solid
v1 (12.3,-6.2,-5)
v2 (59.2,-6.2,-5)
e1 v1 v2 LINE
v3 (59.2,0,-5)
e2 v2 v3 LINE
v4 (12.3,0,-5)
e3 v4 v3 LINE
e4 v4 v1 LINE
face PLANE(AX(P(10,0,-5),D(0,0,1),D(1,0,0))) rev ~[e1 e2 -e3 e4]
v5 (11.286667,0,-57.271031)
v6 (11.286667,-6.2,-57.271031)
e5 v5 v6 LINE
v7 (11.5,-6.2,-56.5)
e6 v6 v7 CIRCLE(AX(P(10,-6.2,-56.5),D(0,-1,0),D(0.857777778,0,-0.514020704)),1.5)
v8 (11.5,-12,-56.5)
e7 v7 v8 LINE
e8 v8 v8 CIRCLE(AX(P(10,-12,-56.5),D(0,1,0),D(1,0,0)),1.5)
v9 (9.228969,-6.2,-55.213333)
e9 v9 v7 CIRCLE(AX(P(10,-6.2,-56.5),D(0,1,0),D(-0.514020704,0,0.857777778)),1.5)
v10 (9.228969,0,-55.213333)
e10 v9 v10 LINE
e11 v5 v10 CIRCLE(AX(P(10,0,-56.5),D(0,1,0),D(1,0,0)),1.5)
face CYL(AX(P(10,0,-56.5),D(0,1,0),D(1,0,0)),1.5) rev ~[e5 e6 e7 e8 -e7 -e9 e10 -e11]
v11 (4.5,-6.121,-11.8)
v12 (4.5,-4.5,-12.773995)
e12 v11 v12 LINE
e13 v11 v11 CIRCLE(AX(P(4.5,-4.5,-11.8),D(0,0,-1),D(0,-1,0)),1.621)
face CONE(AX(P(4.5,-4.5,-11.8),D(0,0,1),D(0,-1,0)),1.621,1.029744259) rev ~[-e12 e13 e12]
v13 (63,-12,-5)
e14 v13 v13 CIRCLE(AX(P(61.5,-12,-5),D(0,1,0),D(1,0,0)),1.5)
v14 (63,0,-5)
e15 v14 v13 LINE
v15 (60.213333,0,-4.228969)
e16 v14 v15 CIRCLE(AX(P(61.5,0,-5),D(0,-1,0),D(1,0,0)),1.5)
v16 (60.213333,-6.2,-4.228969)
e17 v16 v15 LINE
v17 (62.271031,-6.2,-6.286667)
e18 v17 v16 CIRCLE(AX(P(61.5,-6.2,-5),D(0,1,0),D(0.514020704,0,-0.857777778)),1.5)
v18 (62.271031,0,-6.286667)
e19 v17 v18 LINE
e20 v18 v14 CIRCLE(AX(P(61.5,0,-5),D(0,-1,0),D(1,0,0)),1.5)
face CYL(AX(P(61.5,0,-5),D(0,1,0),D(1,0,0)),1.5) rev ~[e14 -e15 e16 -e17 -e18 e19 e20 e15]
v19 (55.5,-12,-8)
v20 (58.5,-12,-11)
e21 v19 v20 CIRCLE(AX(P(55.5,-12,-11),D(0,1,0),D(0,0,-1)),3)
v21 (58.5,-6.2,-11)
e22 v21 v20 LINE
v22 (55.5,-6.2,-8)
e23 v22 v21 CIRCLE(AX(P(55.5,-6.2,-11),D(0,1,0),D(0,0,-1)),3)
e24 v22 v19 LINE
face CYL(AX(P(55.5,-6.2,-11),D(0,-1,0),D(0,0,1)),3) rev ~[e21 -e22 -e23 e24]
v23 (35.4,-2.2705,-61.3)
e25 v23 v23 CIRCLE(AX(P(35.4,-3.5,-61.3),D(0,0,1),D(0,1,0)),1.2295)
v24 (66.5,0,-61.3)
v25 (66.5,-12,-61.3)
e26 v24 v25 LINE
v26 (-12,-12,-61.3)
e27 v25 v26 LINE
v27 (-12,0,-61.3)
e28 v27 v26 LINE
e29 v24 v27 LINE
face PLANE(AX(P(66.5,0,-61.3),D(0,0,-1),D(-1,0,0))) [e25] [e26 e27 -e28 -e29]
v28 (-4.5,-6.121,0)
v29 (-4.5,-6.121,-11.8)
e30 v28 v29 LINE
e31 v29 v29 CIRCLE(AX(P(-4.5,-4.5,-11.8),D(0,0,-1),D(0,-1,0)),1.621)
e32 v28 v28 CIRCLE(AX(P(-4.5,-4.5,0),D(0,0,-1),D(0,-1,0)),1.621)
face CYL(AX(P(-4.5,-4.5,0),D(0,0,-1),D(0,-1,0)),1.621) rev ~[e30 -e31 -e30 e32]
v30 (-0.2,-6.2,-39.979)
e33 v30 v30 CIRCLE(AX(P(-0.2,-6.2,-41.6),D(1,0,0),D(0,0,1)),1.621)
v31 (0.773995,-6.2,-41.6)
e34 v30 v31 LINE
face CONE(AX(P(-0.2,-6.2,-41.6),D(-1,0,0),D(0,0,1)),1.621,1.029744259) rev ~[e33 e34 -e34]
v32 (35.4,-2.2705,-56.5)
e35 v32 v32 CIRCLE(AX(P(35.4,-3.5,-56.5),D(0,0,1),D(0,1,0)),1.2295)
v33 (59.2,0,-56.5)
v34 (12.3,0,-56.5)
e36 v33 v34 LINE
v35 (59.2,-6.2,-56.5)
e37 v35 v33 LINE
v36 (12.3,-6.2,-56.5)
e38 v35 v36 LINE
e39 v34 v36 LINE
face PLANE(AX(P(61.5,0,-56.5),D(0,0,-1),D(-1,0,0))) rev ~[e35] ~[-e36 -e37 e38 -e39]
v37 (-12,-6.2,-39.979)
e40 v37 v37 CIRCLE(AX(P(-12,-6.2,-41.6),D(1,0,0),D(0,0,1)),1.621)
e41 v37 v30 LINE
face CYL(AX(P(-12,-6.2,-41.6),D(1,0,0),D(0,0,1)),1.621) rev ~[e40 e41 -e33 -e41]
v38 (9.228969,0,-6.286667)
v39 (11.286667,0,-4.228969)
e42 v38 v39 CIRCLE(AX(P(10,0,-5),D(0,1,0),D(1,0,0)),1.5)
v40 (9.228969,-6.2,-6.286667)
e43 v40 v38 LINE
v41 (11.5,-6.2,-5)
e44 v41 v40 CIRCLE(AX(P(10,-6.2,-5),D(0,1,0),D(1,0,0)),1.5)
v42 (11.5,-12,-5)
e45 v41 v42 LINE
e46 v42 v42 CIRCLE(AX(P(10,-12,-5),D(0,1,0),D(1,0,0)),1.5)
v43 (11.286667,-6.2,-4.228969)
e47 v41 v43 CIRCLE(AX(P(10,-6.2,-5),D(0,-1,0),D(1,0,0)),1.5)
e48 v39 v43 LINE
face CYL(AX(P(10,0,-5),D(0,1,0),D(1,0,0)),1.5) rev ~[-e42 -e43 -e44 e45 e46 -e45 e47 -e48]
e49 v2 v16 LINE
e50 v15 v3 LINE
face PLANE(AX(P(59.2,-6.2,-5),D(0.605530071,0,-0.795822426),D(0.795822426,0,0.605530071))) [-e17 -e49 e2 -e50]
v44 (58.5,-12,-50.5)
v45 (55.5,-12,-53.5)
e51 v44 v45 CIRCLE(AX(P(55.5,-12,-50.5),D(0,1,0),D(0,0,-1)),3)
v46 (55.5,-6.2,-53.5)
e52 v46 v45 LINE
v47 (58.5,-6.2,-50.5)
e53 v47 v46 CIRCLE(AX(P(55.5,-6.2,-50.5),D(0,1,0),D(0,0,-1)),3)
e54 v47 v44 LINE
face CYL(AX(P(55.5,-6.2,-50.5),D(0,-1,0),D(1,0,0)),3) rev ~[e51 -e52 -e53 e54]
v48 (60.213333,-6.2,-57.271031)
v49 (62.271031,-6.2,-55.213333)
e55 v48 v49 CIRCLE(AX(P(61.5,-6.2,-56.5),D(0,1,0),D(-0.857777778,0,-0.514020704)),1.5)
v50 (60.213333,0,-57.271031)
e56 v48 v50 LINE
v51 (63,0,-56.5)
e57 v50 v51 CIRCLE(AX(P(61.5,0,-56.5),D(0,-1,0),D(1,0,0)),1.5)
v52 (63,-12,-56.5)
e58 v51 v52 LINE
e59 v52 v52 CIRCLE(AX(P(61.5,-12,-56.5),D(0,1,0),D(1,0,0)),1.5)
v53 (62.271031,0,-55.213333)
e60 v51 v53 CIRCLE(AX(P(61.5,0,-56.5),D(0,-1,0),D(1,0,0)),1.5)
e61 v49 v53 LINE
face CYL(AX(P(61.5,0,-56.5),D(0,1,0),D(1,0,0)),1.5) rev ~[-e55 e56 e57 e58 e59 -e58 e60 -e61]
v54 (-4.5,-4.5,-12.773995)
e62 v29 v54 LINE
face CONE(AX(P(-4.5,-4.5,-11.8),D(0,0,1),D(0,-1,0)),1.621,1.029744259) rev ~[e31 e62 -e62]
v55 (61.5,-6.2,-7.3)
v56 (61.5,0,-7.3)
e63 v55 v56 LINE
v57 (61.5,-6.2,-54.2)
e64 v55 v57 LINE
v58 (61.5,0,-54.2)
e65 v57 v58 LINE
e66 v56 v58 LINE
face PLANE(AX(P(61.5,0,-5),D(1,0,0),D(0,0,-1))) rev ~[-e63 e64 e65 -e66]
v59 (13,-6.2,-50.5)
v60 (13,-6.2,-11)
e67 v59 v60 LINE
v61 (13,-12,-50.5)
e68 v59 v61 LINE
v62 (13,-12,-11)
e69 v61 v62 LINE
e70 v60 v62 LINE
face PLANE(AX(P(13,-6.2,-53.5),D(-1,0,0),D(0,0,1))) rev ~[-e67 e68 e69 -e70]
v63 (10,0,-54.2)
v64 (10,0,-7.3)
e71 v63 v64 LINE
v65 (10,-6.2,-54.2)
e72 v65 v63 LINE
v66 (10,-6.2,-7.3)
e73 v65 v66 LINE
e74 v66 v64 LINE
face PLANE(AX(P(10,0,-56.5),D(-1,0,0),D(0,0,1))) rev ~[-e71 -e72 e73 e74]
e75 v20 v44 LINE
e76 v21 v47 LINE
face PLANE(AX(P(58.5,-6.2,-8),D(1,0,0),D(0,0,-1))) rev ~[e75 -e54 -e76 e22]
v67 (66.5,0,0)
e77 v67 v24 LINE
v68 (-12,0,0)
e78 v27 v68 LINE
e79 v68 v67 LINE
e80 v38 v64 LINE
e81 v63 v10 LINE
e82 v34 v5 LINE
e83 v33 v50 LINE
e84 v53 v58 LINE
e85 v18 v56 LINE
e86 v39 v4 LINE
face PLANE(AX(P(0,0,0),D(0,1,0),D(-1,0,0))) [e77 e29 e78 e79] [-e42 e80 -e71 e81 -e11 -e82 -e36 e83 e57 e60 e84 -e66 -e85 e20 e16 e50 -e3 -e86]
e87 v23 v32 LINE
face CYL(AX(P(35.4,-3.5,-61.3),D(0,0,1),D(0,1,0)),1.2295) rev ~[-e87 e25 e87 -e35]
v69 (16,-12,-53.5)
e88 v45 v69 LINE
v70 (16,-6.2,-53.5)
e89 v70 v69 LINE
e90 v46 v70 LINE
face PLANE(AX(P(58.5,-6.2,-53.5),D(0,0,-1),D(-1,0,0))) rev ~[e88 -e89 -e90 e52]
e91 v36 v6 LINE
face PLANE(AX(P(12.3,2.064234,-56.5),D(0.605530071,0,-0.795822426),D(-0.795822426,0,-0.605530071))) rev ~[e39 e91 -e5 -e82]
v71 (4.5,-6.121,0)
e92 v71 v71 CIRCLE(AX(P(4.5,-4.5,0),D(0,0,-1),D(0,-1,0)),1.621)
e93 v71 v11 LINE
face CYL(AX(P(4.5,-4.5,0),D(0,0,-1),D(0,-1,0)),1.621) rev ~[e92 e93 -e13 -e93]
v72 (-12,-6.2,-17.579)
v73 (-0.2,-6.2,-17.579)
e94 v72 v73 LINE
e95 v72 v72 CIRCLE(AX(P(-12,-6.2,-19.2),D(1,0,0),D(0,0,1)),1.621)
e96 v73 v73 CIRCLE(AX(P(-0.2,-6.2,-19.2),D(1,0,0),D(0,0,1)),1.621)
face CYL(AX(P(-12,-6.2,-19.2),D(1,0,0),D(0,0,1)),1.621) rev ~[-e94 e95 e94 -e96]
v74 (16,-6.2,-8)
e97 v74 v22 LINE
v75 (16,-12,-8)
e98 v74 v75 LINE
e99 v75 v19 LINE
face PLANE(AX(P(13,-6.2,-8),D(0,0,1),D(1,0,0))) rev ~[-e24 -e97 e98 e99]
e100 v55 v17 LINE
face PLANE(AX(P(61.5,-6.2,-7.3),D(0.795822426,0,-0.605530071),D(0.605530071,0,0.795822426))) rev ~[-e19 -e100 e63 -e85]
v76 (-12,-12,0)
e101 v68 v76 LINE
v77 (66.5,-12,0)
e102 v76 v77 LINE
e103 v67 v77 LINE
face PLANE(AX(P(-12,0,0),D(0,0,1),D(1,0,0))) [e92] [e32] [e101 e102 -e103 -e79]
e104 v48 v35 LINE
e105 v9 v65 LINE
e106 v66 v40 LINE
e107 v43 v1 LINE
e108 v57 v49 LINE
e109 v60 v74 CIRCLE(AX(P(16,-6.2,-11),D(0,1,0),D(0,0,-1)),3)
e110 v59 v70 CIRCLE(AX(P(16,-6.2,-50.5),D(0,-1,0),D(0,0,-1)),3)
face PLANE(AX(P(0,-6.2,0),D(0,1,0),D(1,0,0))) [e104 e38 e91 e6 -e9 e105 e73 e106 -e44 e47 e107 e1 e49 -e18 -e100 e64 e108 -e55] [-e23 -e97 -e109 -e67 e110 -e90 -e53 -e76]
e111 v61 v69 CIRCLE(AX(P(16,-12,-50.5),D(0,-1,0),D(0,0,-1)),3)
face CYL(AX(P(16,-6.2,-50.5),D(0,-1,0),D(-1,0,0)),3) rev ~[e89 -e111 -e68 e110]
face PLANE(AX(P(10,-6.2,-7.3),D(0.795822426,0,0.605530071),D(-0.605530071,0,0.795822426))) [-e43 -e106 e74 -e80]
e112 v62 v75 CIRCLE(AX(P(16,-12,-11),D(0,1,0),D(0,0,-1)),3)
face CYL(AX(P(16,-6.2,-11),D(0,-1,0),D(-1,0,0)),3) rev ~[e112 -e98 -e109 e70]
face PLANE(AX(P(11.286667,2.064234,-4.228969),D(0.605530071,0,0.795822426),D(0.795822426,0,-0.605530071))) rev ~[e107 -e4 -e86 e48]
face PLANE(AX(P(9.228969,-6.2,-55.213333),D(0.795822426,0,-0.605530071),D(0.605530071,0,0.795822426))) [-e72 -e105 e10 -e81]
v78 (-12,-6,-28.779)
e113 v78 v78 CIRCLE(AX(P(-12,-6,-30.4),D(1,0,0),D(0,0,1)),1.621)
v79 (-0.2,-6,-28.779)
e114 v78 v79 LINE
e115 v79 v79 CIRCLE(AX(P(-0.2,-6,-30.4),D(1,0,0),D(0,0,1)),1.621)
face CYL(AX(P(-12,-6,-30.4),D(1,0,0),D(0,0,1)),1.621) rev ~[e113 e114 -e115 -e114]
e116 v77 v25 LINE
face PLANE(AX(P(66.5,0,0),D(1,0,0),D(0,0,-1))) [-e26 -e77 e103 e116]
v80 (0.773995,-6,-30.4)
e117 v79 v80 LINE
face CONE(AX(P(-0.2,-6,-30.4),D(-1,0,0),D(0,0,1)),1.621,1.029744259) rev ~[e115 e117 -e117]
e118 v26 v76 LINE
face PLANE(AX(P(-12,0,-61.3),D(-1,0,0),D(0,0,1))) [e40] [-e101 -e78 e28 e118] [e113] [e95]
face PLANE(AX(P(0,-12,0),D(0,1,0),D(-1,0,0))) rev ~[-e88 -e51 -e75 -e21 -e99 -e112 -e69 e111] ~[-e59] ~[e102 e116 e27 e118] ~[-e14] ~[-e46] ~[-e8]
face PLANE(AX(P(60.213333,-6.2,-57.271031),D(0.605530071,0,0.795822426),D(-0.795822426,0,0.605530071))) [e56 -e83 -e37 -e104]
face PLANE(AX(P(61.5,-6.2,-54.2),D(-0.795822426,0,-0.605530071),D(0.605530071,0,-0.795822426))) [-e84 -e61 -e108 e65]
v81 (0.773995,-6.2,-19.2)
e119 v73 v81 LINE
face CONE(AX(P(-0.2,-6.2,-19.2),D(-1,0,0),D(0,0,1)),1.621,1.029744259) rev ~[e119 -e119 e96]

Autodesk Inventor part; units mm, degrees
ref_plane "YZ Plane" through (0, 0, 0) normal (1, 0, 0) x (0, 1, 0)
ref_plane "XZ Plane" through (0, 0, 0) normal (0, 1, 0) x (-1, 0, 0)
ref_plane "XY Plane" through (0, 0, 0) normal (0, 0, 1) x (1, 0, 0)
sketch "Sketch1" plane through (0, 0, 0) normal (0, 1, 0) x (-1, 0, 0)
  line L0 (12, 0) -> (-66.5, 0)
  line L1 (-66.5, 0) -> (-66.5, -61.3)
  line L2 (-66.5, -61.3) -> (12, -61.3)
  line L3 (12, -61.3) -> (12, 0)
  point P0 (0, 0)
  dimension "d0" = 12
  dimension "d1" = 66.5
  dimension "d2" = 61.3
extrude "Extrusion1" add sketch "Sketch1" against normal blind 12
sketch "Sketch2" plane through (0, 0, 0) normal (0, 1, 0) x (1, 0, 0)
  line L0 (61.5, 56.5) -> (10, 56.5)
  line L1 (10, 56.5) -> (10, 5)
  line L2 (10, 5) -> (61.5, 5)
  line L3 (61.5, 5) -> (61.5, 56.5)
  line L4 (-12, 0) -> (66.5, 0) projected
  point P0 (0, 0)
  dimension "d5" = 10
  dimension "d6" = 51.5
  dimension "d7" = 5
  dimension "d8" = 51.5
extrude "Extrusion2" cut sketch "Sketch2" against normal blind 6.2
sketch "Sketch3" plane through (0, 0, 0) normal (0, 1, 0) x (1, 0, 0)
  line L0 (61.5, 5) -> (10, 5) projected
  circle A0 centre (10, 5) radius 1.5
  circle A1 centre (61.5, 5) radius 1.5
  line L1 (10, 56.5) -> (61.5, 56.5) projected
  circle A2 centre (61.5, 56.5) radius 1.5
  circle A3 centre (10, 56.5) radius 1.5
  point P0 (0, 0)
  dimension "d11" = 3
extrude "Extrusion3" cut sketch "Sketch3" against normal through all
chamfer "Chamfer1" distance 0.8 angle 45 8 edges at (10, -3.1, -6.5) (10, -3.1, -55) (11.5, -3.1, -56.5) (60, -3.1, -56.5) (61.5, -3.1, -55) (61.5, -3.1, -6.5) (60, -3.1, -5) (11.5, -3.1, -5)
sketch "Sketch4" plane through (0, -6.2, 0) normal (0, 1, 0) x (1, 0, 0)
  arc A0 (9.229, 55.2133) -> (11.2867, 57.271) centre (10, 56.5) ccw construction
  line L0 (10, 56.5) -> (61.5, 56.5) construction
  line L1 (61.5, 56.5) -> (61.5, 5) construction
  line L2 (61.5, 5) -> (10, 5) construction
  line L3 (10, 5) -> (10, 56.5) construction
  arc A1 (60.2133, 4.229) -> (62.271, 6.2867) centre (61.5, 5) ccw construction
  line L4 (58.5, 8) -> (58.5, 53.5) construction
  line L5 (58.5, 53.5) -> (13, 53.5) construction
  line L6 (13, 53.5) -> (13, 8) construction
  line L7 (13, 8) -> (58.5, 8) construction
  line L8 (13, 8) -> (58.5, 8)
  line L9 (58.5, 8) -> (58.5, 53.5)
  line L10 (58.5, 53.5) -> (13, 53.5)
  line L11 (13, 53.5) -> (13, 8)
  point P0 (0, 0)
  dimension "d19" = 3
extrude "Extrusion4" cut sketch "Sketch4" against normal blind 6.2
fillet "Fillet1" radius 3 4 edges at (13, -9.1, -53.5) (58.5, -9.1, -8) (13, -9.1, -8) (58.5, -9.1, -53.5)
sketch "Sketch5" plane through (66.5, 0, -61.3) normal (0, 0, -1) x (-1, 0, 0)
  line L0 (0, 0) -> (78.5, 0) projected
  point P0 (66.5, 0)
  point P1 (31.1, -3.5)
  point P2 (56.5, -6.2)
  dimension "d24" = 25.4
  dimension "d25" = 3.5
hole "Hole1" at (35.4, -3.5, -61.3) direction (0, 0, 1) diameter 2.459 depth 8.8 tip angle 118 thread size "M3x0.5" class "6H" standard "ANSI Metric M Profile"
chamfer "Chamfer2" [suppressed]
sketch "Sketch6" plane through (-12, 0, -61.3) normal (-1, 0, 0) x (0, 0, 1)
  line L0 (56.3, 0) -> (56.3, -6.2) projected
  line L1 (56.3, -6.2) -> (56.3, 0) projected
  line L2 (4.8, -2.2705) -> (4.8, -4.7295) projected
  line L3 (4.8, 0) -> (4.8, -6.2) projected
  line L4 (4.8, -6.2) -> (4.8, 0) projected
  line L5 (30.9, -24.2917) -> (30.9, 19.2353) construction
  line L6 (49.4, 0) -> (12.4, 0) construction
  line L7 (12.4, 0) -> (12.4, -12) construction
  line L8 (12.4, -12) -> (49.4, -12) construction
  line L9 (49.4, -12) -> (49.4, 0) construction
  line L10 (49.4, 0) -> (12.4, -12) construction
  line L11 (12.4, 0) -> (49.4, -12) construction
  line L12 (0, 0) -> (61.3, 0) projected
  line L13 (61.3, -12) -> (0, -12) projected
  line L14 (7.1, -6.2) -> (54, -6.2) projected
  point P0 (30.9, -6)
  point P1 (19.7, -6.2)
  point P2 (42.1, -6.2)
  dimension "d36" = 25.4
  dimension "d37" = 37
  dimension "d38" = 22.4
hole "Hole2" at (-12, -6.2, -41.6) at (-12, -6.2, -19.2) at (-12, -6, -30.4) direction (1, 0, 0) diameter 3.242 depth 11.8 tip angle 118 thread size "M4x0.7" class "6H" standard "ANSI Metric M Profile"
sketch "Sketch7" plane through (-12, 0, 0) normal (0, 0, 1) x (1, 0, 0)
  line L0 (0, 0) -> (78.5, 0) projected
  line L1 (16.5, -4.5) -> (7.5, -4.5) construction
  point P0 (12, 0)
  dimension "d52" = 9
  dimension "d53" = 4.5
  dimension "d54" = 4.5
hole "Hole3" at (-4.5, -4.5, 0) at (4.5, -4.5, 0) direction (0, 0, -1) diameter 3.242 depth 11.8 tip angle 118 thread size "M4x0.7" class "6H" standard "ANSI Metric M Profile"
equation "\"d54\" = 0.5 * d52"
properties part number "MirrorHolder" material "Aluminum 6061"
